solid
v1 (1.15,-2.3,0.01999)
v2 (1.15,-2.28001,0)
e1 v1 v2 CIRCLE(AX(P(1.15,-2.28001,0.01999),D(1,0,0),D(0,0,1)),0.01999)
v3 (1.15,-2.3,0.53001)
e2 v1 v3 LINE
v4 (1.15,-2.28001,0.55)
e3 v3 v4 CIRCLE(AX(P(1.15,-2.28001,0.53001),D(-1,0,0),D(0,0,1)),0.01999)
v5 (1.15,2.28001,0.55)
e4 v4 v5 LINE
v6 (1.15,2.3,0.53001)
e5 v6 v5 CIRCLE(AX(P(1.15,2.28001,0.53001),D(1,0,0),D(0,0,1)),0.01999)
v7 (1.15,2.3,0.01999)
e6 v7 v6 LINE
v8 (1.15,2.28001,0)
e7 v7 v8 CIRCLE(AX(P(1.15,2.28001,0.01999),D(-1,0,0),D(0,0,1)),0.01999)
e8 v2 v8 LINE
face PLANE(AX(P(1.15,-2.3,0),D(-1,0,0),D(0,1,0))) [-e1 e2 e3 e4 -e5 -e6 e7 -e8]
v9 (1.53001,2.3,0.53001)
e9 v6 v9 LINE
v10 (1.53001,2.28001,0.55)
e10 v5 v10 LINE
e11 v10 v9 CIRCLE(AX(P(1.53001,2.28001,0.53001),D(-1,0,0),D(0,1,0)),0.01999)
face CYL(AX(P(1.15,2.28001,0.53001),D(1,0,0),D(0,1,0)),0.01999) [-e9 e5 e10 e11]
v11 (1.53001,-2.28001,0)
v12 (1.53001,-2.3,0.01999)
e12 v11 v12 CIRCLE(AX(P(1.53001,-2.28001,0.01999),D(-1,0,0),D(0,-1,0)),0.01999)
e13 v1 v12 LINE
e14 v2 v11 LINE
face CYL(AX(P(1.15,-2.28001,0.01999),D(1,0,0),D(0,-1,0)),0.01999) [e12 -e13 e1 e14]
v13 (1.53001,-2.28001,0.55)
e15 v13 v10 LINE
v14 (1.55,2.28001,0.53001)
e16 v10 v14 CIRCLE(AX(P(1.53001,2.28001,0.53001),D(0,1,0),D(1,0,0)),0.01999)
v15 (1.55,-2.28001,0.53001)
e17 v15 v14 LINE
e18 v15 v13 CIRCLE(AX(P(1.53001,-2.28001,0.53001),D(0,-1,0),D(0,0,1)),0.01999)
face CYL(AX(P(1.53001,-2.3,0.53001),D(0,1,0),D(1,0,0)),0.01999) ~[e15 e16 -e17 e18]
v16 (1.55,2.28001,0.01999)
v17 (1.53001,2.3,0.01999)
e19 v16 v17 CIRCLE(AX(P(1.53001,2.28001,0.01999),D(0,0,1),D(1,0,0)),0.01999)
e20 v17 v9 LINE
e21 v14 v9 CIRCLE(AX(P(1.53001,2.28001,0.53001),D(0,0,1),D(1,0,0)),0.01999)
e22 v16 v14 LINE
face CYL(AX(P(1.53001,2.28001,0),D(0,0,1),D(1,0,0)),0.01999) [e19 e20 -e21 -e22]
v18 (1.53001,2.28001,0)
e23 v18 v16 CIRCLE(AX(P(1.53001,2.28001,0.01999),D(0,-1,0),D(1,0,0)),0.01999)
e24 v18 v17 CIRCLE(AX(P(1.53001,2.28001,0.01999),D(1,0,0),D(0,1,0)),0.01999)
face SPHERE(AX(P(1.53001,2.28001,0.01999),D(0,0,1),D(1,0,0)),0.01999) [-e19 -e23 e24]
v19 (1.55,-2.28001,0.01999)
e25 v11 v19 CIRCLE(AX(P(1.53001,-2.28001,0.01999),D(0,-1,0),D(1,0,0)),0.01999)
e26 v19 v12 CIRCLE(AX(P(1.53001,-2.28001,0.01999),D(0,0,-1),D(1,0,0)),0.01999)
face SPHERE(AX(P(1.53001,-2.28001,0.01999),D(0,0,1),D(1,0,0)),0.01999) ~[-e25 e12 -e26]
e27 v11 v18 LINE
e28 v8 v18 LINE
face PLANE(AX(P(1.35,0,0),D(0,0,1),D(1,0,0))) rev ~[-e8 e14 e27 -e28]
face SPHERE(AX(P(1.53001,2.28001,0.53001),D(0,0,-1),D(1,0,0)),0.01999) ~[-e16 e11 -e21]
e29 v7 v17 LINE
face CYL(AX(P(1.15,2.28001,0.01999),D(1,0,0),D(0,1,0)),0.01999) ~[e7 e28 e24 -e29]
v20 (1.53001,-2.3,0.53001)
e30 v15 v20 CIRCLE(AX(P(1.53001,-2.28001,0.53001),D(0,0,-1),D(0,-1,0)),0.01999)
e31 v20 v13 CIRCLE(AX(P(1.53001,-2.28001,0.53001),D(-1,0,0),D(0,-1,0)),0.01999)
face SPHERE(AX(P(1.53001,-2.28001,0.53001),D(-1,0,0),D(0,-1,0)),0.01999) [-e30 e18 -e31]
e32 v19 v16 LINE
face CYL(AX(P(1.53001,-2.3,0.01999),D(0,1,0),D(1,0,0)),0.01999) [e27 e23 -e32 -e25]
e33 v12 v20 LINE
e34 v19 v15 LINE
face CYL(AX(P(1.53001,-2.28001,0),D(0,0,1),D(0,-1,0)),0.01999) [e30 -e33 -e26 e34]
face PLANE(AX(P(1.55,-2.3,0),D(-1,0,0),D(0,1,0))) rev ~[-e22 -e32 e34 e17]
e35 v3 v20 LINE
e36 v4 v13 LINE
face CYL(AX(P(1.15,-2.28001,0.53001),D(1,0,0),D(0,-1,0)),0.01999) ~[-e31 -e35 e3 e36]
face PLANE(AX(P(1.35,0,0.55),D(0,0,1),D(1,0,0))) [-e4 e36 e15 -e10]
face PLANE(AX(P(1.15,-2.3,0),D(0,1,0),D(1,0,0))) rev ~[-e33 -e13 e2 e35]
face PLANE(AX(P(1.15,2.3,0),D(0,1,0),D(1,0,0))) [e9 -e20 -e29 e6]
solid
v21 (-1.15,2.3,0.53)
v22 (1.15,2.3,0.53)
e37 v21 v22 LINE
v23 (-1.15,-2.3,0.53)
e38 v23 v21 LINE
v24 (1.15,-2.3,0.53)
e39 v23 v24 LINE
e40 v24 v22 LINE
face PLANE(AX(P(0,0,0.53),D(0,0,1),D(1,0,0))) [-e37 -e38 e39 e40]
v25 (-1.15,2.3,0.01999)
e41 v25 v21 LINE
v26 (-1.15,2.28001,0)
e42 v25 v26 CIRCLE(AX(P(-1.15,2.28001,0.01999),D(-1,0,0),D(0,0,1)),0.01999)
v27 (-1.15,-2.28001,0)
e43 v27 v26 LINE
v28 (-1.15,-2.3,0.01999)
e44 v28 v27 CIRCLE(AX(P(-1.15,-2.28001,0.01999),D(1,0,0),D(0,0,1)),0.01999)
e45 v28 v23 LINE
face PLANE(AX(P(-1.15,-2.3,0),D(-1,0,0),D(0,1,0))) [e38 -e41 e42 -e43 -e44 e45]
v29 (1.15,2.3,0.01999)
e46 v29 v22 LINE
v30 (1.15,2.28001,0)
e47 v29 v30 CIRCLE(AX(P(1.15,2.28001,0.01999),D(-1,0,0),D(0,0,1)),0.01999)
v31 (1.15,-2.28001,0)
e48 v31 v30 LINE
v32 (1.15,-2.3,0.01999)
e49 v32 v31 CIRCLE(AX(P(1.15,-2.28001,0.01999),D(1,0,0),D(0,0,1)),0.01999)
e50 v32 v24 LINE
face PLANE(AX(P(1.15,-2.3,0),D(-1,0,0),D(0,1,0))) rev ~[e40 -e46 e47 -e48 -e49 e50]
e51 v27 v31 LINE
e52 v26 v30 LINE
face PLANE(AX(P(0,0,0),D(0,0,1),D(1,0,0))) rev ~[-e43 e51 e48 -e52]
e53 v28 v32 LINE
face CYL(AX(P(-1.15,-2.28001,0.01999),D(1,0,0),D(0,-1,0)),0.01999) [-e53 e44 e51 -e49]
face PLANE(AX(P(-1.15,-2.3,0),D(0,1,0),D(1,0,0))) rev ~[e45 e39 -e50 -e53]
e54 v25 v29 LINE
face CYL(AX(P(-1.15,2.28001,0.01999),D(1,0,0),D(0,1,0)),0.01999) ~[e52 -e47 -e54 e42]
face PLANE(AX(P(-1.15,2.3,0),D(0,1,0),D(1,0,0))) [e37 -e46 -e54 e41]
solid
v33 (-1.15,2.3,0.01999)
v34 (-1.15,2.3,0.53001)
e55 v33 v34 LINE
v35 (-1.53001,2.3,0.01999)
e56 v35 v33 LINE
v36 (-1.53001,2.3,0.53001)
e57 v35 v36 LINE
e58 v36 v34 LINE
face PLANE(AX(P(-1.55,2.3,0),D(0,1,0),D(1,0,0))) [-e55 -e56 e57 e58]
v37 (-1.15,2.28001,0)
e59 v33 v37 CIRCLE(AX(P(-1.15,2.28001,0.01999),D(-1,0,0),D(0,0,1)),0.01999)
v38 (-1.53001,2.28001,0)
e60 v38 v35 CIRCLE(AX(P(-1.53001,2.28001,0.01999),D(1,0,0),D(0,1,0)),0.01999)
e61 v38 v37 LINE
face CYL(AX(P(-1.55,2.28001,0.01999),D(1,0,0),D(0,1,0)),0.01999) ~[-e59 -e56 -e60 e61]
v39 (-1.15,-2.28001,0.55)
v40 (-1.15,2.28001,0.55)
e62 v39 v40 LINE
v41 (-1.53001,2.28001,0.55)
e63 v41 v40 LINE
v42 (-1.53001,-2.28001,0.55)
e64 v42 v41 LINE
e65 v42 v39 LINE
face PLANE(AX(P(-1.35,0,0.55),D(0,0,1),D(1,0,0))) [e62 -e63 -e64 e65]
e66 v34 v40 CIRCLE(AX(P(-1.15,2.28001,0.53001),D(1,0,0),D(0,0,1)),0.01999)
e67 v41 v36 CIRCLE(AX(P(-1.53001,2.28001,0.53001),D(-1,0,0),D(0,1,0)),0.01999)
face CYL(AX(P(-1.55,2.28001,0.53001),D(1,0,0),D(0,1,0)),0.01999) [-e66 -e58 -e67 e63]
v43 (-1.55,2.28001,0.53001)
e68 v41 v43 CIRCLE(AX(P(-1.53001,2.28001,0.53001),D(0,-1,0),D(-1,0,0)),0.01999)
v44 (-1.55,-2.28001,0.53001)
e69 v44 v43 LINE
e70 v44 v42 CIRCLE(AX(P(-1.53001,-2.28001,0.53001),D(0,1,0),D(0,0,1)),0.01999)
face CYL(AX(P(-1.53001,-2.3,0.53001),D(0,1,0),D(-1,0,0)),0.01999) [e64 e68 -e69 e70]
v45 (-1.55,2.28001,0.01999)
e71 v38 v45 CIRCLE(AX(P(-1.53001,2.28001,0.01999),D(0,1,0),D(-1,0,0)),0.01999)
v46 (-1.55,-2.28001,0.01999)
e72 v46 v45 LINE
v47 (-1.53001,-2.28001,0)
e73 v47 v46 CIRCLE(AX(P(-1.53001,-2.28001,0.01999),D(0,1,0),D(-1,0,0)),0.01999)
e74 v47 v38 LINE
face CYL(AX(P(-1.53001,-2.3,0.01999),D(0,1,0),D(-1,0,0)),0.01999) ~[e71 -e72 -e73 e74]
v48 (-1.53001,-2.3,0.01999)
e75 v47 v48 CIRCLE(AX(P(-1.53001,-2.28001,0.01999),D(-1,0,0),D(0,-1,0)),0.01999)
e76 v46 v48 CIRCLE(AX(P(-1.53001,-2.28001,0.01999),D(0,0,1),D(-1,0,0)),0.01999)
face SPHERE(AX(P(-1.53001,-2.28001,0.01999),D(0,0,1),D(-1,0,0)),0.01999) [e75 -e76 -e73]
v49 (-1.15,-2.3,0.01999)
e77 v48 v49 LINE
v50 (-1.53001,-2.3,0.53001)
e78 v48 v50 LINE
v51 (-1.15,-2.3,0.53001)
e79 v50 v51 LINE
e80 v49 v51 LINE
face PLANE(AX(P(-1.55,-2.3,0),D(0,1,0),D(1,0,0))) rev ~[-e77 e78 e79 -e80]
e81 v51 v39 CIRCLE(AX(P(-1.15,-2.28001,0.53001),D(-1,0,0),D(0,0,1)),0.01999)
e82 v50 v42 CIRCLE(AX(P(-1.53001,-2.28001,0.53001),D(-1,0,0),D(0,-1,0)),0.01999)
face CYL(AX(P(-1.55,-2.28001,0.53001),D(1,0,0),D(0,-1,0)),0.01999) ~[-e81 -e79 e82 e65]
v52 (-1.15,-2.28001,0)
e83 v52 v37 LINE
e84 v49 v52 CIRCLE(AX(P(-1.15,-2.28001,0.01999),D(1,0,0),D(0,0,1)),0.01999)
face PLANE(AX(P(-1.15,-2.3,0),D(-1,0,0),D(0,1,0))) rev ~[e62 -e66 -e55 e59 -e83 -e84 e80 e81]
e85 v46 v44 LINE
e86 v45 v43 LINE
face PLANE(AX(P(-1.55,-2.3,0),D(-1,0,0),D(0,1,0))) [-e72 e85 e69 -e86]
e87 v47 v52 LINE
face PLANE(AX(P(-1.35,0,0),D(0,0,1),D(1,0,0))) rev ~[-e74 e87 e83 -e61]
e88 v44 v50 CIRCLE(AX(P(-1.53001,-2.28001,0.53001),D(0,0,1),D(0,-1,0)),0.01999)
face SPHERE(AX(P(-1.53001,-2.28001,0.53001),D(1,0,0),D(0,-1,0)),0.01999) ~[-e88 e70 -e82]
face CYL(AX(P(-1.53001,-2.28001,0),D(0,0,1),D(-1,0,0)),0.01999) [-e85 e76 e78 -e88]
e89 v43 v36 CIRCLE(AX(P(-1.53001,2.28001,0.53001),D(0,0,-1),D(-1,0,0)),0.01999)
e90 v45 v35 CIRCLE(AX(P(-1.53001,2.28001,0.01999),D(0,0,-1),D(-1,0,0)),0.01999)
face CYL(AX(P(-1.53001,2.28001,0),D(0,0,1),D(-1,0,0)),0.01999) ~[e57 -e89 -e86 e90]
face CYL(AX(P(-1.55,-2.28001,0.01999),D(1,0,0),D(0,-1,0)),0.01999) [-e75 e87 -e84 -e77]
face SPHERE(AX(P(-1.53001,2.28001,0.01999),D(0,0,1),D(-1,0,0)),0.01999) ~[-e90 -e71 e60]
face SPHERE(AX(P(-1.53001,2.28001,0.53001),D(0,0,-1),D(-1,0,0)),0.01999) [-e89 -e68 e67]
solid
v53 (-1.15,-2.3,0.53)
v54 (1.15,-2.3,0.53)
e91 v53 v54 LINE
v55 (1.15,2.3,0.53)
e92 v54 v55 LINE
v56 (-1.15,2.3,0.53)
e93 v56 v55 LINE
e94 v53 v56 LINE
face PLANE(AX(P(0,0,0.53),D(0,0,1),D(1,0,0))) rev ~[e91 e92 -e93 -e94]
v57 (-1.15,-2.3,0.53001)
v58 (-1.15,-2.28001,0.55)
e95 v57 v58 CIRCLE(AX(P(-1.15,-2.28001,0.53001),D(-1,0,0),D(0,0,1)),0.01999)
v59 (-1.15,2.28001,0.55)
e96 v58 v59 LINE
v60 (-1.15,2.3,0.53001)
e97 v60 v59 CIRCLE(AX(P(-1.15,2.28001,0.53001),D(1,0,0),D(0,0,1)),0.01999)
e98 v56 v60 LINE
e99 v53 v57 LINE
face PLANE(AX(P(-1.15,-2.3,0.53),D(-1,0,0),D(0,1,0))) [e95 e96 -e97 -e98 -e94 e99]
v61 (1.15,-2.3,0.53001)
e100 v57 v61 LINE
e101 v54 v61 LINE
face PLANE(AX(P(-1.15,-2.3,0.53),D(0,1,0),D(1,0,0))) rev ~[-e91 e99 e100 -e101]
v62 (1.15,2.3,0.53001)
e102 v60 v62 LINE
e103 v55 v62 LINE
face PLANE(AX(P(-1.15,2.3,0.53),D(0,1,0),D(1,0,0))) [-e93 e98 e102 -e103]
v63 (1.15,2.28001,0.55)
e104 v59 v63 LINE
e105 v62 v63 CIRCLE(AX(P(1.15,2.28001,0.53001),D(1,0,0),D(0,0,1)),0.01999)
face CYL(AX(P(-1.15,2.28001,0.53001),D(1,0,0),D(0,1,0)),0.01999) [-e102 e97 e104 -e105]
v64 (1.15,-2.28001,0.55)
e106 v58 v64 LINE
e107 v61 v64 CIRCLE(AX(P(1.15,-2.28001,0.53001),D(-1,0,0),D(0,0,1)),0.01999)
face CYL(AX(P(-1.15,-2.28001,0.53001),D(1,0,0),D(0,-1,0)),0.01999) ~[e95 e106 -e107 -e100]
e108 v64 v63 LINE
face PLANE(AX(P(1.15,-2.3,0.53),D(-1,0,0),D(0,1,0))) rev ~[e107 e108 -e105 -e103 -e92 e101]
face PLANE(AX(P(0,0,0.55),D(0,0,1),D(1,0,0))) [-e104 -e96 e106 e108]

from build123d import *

# Parameters (mm, degrees)
F2_W     = 2.3
F2_H     = 4.6
F3_DEPTH = 0.53
F2_W_2   = 0.4
F4_DEPTH = 0.55
F5_DEPTH = 0.55
F6_DEPTH = 0.02
F7_R     = 0.01999
F7_2_R   = 0.01999
F7_3_R   = 0.01999
F7_4_R   = 0.01999


# Not quite as in the source:
# - a fillet or chamfer is up to 0.001 mm smaller than in the source, because OpenCascade refuses the exact size


with BuildPart() as f3:
    # F2 (on Top) → F3 (new body)
    with BuildSketch(Plane.XY):
        Rectangle(F2_W, F2_H)
    extrude(amount=F3_DEPTH)


with BuildPart() as f4:
    # F2 (on Top) → F4 (new body)
    with BuildSketch(Plane.XY):
        with Locations((-1.35, 0)):
            Rectangle(F2_W_2, F2_H)
    extrude(amount=F4_DEPTH)

    # F7 (radius 0.02 in the source; OpenCascade refuses exactly that, so slightly less here)
    f7_edges = [f4.edges().sort_by_distance(p)[0] for p in [
        (-1.35, -2.3, 0.55),
        (-1.55, 2.3, 0.275),
        (-1.55, -2.3, 0.275),
        (-1.55, 0, 0),
        (-1.55, 0, 0.55),
        (-1.35, 2.3, 0.55),
        (-1.35, 2.3, 0),
        (-1.35, -2.3, 0),
    ]]
    fillet(f7_edges, radius=F7_R)


with BuildPart() as f5:
    # F2 (on Top) → F5 (new body)
    with BuildSketch(Plane.XY):
        with Locations((1.35, 0)):
            Rectangle(F2_W_2, F2_H)
    extrude(amount=F5_DEPTH)

    # F7#2 (radius 0.02 in the source; OpenCascade refuses exactly that, so slightly less here)
    f7_2_edges = [f5.edges().sort_by_distance(p)[0] for p in [
        (1.35, -2.3, 0.55),
        (1.55, -2.3, 0.275),
        (1.55, 2.3, 0.275),
        (1.55, 0, 0),
        (1.55, 0, 0.55),
        (1.35, 2.3, 0.55),
        (1.35, 2.3, 0),
        (1.35, -2.3, 0),
    ]]
    fillet(f7_2_edges, radius=F7_2_R)


with BuildPart() as f6:
    # F6 (new): a face of the model
    f6_faces = [f3.part.faces().sort_by_distance(p)[0] for p in [
        (0, 0, 0.53),
    ]]
    extrude(f6_faces, amount=F6_DEPTH)

    # F7#4 (radius 0.02 in the source; OpenCascade refuses exactly that, so slightly less here)
    f7_4_edges = [f6.edges().sort_by_distance(p)[0] for p in [
        (0, -2.3, 0.55),
        (0, 2.3, 0.55),
    ]]
    fillet(f7_4_edges, radius=F7_4_R)


with BuildPart() as f3_1:
    add(f3.part)

    # F7#3 (radius 0.02 in the source; OpenCascade refuses exactly that, so slightly less here)
    f7_3_edges = [f3_1.edges().sort_by_distance(p)[0] for p in [
        (0, 2.3, 0),
        (0, -2.3, 0),
    ]]
    fillet(f7_3_edges, radius=F7_3_R)


solid = Compound([f4.part, f5.part, f6.part, f3_1.part])
